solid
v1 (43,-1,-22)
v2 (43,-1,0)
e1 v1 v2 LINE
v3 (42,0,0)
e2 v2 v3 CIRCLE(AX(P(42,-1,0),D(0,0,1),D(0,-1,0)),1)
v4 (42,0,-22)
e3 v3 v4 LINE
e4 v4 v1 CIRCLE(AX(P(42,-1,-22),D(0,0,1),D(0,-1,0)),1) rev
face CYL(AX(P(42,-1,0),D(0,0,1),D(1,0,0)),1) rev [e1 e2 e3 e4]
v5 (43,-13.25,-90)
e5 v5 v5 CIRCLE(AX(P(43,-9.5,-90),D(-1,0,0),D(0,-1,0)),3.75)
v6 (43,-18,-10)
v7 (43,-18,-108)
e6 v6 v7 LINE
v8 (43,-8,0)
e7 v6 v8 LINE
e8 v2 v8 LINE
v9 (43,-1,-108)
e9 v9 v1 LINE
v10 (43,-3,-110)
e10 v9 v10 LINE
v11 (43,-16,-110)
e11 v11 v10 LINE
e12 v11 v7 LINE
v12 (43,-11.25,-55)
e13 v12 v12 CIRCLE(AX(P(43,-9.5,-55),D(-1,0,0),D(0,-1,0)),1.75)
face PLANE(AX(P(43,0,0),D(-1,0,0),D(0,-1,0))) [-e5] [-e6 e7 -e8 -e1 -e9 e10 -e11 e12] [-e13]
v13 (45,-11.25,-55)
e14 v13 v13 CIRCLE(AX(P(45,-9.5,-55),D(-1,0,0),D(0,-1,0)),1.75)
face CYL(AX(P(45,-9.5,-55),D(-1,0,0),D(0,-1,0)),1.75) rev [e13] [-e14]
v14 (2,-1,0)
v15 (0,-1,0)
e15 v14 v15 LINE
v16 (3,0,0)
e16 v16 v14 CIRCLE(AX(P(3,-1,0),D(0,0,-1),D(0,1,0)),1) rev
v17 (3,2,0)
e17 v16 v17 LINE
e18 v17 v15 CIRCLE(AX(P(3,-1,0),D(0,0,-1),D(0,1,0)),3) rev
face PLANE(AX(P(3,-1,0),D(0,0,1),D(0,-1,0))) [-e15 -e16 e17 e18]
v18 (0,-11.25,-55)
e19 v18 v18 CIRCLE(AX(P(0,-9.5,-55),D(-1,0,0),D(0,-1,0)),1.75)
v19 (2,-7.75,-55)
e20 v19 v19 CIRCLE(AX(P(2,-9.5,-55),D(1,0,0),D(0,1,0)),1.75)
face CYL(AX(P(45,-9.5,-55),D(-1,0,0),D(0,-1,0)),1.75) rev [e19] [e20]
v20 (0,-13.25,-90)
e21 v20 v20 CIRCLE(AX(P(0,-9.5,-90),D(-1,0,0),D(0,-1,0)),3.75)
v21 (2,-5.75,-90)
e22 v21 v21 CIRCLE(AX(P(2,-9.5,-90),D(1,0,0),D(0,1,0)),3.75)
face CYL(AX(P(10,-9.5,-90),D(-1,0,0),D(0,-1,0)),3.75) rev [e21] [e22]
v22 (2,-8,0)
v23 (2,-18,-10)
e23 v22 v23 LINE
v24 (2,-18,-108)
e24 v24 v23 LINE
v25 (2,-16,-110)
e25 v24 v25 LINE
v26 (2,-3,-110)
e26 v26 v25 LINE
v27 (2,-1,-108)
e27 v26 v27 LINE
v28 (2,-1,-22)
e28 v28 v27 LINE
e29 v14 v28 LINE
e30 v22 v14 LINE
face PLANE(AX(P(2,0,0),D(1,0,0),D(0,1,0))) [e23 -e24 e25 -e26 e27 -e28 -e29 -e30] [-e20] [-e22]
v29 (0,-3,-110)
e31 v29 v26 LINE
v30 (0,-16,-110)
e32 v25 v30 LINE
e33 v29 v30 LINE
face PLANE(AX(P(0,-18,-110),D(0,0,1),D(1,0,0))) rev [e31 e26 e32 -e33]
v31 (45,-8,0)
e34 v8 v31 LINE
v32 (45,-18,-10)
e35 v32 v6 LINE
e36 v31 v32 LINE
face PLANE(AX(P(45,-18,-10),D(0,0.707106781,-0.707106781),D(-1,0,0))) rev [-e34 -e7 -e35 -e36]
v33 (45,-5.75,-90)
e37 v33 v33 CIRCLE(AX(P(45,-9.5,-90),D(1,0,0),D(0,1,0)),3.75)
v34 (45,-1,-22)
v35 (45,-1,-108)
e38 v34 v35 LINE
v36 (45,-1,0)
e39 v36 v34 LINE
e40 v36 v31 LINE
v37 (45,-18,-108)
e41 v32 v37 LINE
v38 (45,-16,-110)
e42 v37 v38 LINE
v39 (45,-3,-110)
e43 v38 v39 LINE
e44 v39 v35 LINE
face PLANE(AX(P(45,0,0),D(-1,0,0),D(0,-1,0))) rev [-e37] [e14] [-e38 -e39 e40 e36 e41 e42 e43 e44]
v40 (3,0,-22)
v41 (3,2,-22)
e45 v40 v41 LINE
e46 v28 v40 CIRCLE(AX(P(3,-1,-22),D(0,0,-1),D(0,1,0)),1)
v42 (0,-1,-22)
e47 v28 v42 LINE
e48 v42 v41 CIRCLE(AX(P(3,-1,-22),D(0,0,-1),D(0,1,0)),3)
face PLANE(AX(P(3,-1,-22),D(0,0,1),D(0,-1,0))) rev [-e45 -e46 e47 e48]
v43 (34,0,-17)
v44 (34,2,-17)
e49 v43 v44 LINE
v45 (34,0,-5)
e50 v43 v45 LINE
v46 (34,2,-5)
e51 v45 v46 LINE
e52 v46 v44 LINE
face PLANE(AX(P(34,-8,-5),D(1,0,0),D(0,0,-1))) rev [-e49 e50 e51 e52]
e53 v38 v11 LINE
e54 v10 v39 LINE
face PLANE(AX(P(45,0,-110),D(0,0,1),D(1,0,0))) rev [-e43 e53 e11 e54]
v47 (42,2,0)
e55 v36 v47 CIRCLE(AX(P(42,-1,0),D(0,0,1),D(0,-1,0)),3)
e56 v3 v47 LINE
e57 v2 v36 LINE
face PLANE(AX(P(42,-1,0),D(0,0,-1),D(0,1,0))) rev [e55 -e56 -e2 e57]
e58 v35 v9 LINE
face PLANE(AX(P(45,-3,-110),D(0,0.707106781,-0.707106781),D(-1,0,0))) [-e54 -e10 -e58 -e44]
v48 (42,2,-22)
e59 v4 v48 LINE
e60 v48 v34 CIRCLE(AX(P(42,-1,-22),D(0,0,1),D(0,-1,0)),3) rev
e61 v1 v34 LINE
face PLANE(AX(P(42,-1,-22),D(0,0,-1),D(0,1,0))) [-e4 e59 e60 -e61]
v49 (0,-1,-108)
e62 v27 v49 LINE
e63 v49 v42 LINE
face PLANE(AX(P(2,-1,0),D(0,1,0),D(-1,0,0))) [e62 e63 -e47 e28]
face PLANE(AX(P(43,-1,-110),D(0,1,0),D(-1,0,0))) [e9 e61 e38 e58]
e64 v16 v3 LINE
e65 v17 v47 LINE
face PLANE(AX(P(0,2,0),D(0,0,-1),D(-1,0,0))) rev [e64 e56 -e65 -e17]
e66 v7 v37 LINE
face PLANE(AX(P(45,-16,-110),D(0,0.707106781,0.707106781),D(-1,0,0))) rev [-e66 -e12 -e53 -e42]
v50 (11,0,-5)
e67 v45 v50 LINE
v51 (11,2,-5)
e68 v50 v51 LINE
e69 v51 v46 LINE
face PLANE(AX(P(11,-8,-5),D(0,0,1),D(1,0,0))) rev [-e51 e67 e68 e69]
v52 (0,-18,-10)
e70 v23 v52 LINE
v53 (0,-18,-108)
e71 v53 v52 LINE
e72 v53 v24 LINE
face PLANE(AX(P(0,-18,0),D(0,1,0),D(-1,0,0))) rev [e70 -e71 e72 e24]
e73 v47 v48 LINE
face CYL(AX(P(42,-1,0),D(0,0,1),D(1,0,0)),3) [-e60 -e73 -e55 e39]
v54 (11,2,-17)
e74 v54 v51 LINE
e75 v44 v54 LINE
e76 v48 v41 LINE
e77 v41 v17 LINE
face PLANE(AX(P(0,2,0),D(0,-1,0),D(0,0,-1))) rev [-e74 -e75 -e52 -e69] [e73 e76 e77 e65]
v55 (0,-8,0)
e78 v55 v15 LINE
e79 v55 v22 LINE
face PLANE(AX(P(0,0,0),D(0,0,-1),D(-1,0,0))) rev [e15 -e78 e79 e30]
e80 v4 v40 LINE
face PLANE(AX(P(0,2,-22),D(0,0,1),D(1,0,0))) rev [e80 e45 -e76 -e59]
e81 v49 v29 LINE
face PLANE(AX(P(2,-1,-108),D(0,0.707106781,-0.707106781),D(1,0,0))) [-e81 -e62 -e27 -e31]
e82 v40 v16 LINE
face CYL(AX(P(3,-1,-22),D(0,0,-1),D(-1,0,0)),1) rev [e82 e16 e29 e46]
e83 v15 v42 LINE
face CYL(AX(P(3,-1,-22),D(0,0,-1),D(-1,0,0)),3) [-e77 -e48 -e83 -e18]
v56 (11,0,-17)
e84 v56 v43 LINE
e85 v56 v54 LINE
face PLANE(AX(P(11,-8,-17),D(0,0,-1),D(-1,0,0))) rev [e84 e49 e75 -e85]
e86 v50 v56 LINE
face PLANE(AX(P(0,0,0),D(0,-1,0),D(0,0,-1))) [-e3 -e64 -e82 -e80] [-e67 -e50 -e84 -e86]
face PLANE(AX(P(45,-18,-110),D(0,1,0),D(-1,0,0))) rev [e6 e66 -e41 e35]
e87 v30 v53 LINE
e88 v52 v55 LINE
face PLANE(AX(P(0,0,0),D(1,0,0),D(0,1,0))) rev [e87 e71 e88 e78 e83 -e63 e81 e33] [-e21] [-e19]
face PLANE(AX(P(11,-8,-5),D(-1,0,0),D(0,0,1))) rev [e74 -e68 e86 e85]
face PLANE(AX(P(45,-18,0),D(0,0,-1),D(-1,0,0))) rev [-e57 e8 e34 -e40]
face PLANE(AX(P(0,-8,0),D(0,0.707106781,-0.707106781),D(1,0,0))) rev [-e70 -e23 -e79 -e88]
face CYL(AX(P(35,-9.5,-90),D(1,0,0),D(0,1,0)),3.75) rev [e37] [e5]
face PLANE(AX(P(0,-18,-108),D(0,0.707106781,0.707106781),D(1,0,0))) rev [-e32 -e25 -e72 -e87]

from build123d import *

# Parameters (mm, degrees)
SKETCH1_W                      = 45
SKETCH1_H                      = 22
BASE_FLANGE1_DEPTH             = 2
EDGE_FLANGE1_STRIP_W           = 10
EDGE_FLANGE1_STRIP_H           = 2
EDGE_FLANGE1_STRIP_CUT_DEPTH   = 22
EDGE_FLANGE1_STRIP_2_W         = 10
EDGE_FLANGE1_STRIP_2_H         = 2
EDGE_FLANGE1_STRIP_CUT_2_DEPTH = 22
EDGE_FLANGE1_DEPTH             = 22
EDGE_FLANGE1_PROFILE_W         = 110
EDGE_FLANGE1_PROFILE_H         = 17
EDGE_FLANGE1_FLAT_DEPTH        = 2
EDGE_FLANGE1_BEND_DEPTH        = 22
EDGE_FLANGE1_PROFILE_2_W       = 110
EDGE_FLANGE1_PROFILE_2_H       = 17
EDGE_FLANGE1_FLAT_2_DEPTH      = 2
SKETCH24_R                     = 3.75
CUT_EXTRUDE1_DEPTH             = 10
CUT_EXTRUDE2_START             = -10
SKETCH25_R                     = 3.75
CUT_EXTRUDE2_DEPTH             = 10
SKETCH28_R                     = 1.75
CUT_EXTRUDE3_DEPTH             = 121.203993278
SKETCH29_W                     = 23
SKETCH29_H                     = 12
CUT_EXTRUDE4_DEPTH             = 10
CHAMFER1_SIZE                  = 2
CHAMFER2_SIZE                  = 10


# Sheet-metal steps are written as plain solids
with BuildPart() as part:
    # Sketch1 → Base-Flange1 (new body)
    with BuildSketch(Plane(origin=(0, 0, 0), x_dir=(1, 0, 0), z_dir=(0, 1, 0))):
        with Locations((22.5, 11)):
            Rectangle(SKETCH1_W, SKETCH1_H)
    extrude(amount=BASE_FLANGE1_DEPTH)

    # Edge-Flange1 strip (across the edge) → Edge-Flange1 strip cut (cut)
    with BuildSketch(Plane(origin=(45, 0, -22), x_dir=(-1, 0, 0), z_dir=(0, 0, 1))):
        with Locations((-2, -1)):
            Rectangle(EDGE_FLANGE1_STRIP_W, EDGE_FLANGE1_STRIP_H)
    extrude(amount=EDGE_FLANGE1_STRIP_CUT_DEPTH, mode=Mode.SUBTRACT)

    # Edge-Flange1 strip 2 (across the edge) → Edge-Flange1 strip cut 2 (cut)
    with BuildSketch(Plane(origin=(0, 0, 0), x_dir=(1, 0, 0), z_dir=(0, 0, -1))):
        with Locations((-2, -1)):
            Rectangle(EDGE_FLANGE1_STRIP_2_W, EDGE_FLANGE1_STRIP_2_H)
    extrude(amount=EDGE_FLANGE1_STRIP_CUT_2_DEPTH, mode=Mode.SUBTRACT)

    # Edge-Flange1 bend section (across the edge) → Edge-Flange1 (add)
    with BuildSketch(Plane(origin=(45, 0, -22), x_dir=(-1, 0, 0), z_dir=(0, 0, 1))):
        with BuildLine():
            Line((0, 1), (2, 1))
            ThreePointArc((2, 1), (2.292893219, 0.292893219), (3, 0))
            Line((3, 0), (3, -2))
            ThreePointArc((3, -2), (0.878679656, -1.121320344), (0, 1))
        make_face()
    extrude(amount=EDGE_FLANGE1_DEPTH)

    # Edge-Flange1 profile (on flange) → Edge-Flange1 flat (add)
    with BuildSketch(Plane(origin=(45, 0, 0), x_dir=(0, 0, 1), z_dir=(1, 0, 0))):
        with Locations((-55, 9.5)):
            Rectangle(EDGE_FLANGE1_PROFILE_W, EDGE_FLANGE1_PROFILE_H)
    extrude(amount=-EDGE_FLANGE1_FLAT_DEPTH)

    # Edge-Flange1 bend section 2 (across the edge) → Edge-Flange1 bend (add)
    with BuildSketch(Plane(origin=(0, 0, 0), x_dir=(1, 0, 0), z_dir=(0, 0, -1))):
        with BuildLine():
            Line((0, 1), (2, 1))
            ThreePointArc((2, 1), (2.292893219, 0.292893219), (3, 0))
            Line((3, 0), (3, -2))
            ThreePointArc((3, -2), (0.878679656, -1.121320344), (0, 1))
        make_face()
    extrude(amount=EDGE_FLANGE1_BEND_DEPTH)

    # Edge-Flange1 profile 2 (on flange) → Edge-Flange1 flat 2 (add)
    with BuildSketch(Plane(origin=(0, 0, 0), x_dir=(0, 0, -1), z_dir=(-1, 0, 0))):
        with Locations((55, 9.5)):
            Rectangle(EDGE_FLANGE1_PROFILE_2_W, EDGE_FLANGE1_PROFILE_2_H)
    extrude(amount=-EDGE_FLANGE1_FLAT_2_DEPTH)

    # Sketch24 → Cut-Extrude1 (cut)
    with BuildSketch(Plane(origin=(45, 0, 0), x_dir=(0, 0, -1), z_dir=(1, 0, 0))):
        with Locations(Location((90, -9.5, 0), (0, 0, 90))):
            Circle(SKETCH24_R)
    extrude(amount=-CUT_EXTRUDE1_DEPTH, mode=Mode.SUBTRACT)

    # Sketch25 → Cut-Extrude2 (cut)
    with BuildSketch(Plane.ZY.offset(CUT_EXTRUDE2_START)):
        with Locations(Location((-90, -9.5, 0), (0, 0, 90))):
            Circle(SKETCH25_R)
    extrude(amount=CUT_EXTRUDE2_DEPTH, mode=Mode.SUBTRACT)

    # Sketch28 → Cut-Extrude3 (cut, through all)
    with BuildSketch(Plane.ZY):
        with Locations(Location((-55, -9.5, 0), (0, 0, 270))):
            Circle(SKETCH28_R)
    extrude(amount=-CUT_EXTRUDE3_DEPTH, mode=Mode.SUBTRACT)

    # Sketch29 → Cut-Extrude4 (cut)
    with BuildSketch(Plane(origin=(0, 2, 0), x_dir=(1, 0, 0), z_dir=(0, 1, 0))):
        with Locations((22.5, 11)):
            Rectangle(SKETCH29_W, SKETCH29_H)
    extrude(amount=-CUT_EXTRUDE4_DEPTH, mode=Mode.SUBTRACT)

    # Chamfer1
    chamfer1_edges = [part.edges().sort_by_distance(p)[0] for p in [
        (44, -1, -110),
        (44, -18, -110),
        (1, -1, -110),
        (1, -18, -110),
    ]]
    chamfer(chamfer1_edges, length=CHAMFER1_SIZE)

    # Chamfer2
    chamfer2_edges = [part.edges().sort_by_distance(p)[0] for p in [
        (44, -18, 0),
        (1, -18, 0),
    ]]
    chamfer(chamfer2_edges, length=CHAMFER2_SIZE)


solid = part.part
